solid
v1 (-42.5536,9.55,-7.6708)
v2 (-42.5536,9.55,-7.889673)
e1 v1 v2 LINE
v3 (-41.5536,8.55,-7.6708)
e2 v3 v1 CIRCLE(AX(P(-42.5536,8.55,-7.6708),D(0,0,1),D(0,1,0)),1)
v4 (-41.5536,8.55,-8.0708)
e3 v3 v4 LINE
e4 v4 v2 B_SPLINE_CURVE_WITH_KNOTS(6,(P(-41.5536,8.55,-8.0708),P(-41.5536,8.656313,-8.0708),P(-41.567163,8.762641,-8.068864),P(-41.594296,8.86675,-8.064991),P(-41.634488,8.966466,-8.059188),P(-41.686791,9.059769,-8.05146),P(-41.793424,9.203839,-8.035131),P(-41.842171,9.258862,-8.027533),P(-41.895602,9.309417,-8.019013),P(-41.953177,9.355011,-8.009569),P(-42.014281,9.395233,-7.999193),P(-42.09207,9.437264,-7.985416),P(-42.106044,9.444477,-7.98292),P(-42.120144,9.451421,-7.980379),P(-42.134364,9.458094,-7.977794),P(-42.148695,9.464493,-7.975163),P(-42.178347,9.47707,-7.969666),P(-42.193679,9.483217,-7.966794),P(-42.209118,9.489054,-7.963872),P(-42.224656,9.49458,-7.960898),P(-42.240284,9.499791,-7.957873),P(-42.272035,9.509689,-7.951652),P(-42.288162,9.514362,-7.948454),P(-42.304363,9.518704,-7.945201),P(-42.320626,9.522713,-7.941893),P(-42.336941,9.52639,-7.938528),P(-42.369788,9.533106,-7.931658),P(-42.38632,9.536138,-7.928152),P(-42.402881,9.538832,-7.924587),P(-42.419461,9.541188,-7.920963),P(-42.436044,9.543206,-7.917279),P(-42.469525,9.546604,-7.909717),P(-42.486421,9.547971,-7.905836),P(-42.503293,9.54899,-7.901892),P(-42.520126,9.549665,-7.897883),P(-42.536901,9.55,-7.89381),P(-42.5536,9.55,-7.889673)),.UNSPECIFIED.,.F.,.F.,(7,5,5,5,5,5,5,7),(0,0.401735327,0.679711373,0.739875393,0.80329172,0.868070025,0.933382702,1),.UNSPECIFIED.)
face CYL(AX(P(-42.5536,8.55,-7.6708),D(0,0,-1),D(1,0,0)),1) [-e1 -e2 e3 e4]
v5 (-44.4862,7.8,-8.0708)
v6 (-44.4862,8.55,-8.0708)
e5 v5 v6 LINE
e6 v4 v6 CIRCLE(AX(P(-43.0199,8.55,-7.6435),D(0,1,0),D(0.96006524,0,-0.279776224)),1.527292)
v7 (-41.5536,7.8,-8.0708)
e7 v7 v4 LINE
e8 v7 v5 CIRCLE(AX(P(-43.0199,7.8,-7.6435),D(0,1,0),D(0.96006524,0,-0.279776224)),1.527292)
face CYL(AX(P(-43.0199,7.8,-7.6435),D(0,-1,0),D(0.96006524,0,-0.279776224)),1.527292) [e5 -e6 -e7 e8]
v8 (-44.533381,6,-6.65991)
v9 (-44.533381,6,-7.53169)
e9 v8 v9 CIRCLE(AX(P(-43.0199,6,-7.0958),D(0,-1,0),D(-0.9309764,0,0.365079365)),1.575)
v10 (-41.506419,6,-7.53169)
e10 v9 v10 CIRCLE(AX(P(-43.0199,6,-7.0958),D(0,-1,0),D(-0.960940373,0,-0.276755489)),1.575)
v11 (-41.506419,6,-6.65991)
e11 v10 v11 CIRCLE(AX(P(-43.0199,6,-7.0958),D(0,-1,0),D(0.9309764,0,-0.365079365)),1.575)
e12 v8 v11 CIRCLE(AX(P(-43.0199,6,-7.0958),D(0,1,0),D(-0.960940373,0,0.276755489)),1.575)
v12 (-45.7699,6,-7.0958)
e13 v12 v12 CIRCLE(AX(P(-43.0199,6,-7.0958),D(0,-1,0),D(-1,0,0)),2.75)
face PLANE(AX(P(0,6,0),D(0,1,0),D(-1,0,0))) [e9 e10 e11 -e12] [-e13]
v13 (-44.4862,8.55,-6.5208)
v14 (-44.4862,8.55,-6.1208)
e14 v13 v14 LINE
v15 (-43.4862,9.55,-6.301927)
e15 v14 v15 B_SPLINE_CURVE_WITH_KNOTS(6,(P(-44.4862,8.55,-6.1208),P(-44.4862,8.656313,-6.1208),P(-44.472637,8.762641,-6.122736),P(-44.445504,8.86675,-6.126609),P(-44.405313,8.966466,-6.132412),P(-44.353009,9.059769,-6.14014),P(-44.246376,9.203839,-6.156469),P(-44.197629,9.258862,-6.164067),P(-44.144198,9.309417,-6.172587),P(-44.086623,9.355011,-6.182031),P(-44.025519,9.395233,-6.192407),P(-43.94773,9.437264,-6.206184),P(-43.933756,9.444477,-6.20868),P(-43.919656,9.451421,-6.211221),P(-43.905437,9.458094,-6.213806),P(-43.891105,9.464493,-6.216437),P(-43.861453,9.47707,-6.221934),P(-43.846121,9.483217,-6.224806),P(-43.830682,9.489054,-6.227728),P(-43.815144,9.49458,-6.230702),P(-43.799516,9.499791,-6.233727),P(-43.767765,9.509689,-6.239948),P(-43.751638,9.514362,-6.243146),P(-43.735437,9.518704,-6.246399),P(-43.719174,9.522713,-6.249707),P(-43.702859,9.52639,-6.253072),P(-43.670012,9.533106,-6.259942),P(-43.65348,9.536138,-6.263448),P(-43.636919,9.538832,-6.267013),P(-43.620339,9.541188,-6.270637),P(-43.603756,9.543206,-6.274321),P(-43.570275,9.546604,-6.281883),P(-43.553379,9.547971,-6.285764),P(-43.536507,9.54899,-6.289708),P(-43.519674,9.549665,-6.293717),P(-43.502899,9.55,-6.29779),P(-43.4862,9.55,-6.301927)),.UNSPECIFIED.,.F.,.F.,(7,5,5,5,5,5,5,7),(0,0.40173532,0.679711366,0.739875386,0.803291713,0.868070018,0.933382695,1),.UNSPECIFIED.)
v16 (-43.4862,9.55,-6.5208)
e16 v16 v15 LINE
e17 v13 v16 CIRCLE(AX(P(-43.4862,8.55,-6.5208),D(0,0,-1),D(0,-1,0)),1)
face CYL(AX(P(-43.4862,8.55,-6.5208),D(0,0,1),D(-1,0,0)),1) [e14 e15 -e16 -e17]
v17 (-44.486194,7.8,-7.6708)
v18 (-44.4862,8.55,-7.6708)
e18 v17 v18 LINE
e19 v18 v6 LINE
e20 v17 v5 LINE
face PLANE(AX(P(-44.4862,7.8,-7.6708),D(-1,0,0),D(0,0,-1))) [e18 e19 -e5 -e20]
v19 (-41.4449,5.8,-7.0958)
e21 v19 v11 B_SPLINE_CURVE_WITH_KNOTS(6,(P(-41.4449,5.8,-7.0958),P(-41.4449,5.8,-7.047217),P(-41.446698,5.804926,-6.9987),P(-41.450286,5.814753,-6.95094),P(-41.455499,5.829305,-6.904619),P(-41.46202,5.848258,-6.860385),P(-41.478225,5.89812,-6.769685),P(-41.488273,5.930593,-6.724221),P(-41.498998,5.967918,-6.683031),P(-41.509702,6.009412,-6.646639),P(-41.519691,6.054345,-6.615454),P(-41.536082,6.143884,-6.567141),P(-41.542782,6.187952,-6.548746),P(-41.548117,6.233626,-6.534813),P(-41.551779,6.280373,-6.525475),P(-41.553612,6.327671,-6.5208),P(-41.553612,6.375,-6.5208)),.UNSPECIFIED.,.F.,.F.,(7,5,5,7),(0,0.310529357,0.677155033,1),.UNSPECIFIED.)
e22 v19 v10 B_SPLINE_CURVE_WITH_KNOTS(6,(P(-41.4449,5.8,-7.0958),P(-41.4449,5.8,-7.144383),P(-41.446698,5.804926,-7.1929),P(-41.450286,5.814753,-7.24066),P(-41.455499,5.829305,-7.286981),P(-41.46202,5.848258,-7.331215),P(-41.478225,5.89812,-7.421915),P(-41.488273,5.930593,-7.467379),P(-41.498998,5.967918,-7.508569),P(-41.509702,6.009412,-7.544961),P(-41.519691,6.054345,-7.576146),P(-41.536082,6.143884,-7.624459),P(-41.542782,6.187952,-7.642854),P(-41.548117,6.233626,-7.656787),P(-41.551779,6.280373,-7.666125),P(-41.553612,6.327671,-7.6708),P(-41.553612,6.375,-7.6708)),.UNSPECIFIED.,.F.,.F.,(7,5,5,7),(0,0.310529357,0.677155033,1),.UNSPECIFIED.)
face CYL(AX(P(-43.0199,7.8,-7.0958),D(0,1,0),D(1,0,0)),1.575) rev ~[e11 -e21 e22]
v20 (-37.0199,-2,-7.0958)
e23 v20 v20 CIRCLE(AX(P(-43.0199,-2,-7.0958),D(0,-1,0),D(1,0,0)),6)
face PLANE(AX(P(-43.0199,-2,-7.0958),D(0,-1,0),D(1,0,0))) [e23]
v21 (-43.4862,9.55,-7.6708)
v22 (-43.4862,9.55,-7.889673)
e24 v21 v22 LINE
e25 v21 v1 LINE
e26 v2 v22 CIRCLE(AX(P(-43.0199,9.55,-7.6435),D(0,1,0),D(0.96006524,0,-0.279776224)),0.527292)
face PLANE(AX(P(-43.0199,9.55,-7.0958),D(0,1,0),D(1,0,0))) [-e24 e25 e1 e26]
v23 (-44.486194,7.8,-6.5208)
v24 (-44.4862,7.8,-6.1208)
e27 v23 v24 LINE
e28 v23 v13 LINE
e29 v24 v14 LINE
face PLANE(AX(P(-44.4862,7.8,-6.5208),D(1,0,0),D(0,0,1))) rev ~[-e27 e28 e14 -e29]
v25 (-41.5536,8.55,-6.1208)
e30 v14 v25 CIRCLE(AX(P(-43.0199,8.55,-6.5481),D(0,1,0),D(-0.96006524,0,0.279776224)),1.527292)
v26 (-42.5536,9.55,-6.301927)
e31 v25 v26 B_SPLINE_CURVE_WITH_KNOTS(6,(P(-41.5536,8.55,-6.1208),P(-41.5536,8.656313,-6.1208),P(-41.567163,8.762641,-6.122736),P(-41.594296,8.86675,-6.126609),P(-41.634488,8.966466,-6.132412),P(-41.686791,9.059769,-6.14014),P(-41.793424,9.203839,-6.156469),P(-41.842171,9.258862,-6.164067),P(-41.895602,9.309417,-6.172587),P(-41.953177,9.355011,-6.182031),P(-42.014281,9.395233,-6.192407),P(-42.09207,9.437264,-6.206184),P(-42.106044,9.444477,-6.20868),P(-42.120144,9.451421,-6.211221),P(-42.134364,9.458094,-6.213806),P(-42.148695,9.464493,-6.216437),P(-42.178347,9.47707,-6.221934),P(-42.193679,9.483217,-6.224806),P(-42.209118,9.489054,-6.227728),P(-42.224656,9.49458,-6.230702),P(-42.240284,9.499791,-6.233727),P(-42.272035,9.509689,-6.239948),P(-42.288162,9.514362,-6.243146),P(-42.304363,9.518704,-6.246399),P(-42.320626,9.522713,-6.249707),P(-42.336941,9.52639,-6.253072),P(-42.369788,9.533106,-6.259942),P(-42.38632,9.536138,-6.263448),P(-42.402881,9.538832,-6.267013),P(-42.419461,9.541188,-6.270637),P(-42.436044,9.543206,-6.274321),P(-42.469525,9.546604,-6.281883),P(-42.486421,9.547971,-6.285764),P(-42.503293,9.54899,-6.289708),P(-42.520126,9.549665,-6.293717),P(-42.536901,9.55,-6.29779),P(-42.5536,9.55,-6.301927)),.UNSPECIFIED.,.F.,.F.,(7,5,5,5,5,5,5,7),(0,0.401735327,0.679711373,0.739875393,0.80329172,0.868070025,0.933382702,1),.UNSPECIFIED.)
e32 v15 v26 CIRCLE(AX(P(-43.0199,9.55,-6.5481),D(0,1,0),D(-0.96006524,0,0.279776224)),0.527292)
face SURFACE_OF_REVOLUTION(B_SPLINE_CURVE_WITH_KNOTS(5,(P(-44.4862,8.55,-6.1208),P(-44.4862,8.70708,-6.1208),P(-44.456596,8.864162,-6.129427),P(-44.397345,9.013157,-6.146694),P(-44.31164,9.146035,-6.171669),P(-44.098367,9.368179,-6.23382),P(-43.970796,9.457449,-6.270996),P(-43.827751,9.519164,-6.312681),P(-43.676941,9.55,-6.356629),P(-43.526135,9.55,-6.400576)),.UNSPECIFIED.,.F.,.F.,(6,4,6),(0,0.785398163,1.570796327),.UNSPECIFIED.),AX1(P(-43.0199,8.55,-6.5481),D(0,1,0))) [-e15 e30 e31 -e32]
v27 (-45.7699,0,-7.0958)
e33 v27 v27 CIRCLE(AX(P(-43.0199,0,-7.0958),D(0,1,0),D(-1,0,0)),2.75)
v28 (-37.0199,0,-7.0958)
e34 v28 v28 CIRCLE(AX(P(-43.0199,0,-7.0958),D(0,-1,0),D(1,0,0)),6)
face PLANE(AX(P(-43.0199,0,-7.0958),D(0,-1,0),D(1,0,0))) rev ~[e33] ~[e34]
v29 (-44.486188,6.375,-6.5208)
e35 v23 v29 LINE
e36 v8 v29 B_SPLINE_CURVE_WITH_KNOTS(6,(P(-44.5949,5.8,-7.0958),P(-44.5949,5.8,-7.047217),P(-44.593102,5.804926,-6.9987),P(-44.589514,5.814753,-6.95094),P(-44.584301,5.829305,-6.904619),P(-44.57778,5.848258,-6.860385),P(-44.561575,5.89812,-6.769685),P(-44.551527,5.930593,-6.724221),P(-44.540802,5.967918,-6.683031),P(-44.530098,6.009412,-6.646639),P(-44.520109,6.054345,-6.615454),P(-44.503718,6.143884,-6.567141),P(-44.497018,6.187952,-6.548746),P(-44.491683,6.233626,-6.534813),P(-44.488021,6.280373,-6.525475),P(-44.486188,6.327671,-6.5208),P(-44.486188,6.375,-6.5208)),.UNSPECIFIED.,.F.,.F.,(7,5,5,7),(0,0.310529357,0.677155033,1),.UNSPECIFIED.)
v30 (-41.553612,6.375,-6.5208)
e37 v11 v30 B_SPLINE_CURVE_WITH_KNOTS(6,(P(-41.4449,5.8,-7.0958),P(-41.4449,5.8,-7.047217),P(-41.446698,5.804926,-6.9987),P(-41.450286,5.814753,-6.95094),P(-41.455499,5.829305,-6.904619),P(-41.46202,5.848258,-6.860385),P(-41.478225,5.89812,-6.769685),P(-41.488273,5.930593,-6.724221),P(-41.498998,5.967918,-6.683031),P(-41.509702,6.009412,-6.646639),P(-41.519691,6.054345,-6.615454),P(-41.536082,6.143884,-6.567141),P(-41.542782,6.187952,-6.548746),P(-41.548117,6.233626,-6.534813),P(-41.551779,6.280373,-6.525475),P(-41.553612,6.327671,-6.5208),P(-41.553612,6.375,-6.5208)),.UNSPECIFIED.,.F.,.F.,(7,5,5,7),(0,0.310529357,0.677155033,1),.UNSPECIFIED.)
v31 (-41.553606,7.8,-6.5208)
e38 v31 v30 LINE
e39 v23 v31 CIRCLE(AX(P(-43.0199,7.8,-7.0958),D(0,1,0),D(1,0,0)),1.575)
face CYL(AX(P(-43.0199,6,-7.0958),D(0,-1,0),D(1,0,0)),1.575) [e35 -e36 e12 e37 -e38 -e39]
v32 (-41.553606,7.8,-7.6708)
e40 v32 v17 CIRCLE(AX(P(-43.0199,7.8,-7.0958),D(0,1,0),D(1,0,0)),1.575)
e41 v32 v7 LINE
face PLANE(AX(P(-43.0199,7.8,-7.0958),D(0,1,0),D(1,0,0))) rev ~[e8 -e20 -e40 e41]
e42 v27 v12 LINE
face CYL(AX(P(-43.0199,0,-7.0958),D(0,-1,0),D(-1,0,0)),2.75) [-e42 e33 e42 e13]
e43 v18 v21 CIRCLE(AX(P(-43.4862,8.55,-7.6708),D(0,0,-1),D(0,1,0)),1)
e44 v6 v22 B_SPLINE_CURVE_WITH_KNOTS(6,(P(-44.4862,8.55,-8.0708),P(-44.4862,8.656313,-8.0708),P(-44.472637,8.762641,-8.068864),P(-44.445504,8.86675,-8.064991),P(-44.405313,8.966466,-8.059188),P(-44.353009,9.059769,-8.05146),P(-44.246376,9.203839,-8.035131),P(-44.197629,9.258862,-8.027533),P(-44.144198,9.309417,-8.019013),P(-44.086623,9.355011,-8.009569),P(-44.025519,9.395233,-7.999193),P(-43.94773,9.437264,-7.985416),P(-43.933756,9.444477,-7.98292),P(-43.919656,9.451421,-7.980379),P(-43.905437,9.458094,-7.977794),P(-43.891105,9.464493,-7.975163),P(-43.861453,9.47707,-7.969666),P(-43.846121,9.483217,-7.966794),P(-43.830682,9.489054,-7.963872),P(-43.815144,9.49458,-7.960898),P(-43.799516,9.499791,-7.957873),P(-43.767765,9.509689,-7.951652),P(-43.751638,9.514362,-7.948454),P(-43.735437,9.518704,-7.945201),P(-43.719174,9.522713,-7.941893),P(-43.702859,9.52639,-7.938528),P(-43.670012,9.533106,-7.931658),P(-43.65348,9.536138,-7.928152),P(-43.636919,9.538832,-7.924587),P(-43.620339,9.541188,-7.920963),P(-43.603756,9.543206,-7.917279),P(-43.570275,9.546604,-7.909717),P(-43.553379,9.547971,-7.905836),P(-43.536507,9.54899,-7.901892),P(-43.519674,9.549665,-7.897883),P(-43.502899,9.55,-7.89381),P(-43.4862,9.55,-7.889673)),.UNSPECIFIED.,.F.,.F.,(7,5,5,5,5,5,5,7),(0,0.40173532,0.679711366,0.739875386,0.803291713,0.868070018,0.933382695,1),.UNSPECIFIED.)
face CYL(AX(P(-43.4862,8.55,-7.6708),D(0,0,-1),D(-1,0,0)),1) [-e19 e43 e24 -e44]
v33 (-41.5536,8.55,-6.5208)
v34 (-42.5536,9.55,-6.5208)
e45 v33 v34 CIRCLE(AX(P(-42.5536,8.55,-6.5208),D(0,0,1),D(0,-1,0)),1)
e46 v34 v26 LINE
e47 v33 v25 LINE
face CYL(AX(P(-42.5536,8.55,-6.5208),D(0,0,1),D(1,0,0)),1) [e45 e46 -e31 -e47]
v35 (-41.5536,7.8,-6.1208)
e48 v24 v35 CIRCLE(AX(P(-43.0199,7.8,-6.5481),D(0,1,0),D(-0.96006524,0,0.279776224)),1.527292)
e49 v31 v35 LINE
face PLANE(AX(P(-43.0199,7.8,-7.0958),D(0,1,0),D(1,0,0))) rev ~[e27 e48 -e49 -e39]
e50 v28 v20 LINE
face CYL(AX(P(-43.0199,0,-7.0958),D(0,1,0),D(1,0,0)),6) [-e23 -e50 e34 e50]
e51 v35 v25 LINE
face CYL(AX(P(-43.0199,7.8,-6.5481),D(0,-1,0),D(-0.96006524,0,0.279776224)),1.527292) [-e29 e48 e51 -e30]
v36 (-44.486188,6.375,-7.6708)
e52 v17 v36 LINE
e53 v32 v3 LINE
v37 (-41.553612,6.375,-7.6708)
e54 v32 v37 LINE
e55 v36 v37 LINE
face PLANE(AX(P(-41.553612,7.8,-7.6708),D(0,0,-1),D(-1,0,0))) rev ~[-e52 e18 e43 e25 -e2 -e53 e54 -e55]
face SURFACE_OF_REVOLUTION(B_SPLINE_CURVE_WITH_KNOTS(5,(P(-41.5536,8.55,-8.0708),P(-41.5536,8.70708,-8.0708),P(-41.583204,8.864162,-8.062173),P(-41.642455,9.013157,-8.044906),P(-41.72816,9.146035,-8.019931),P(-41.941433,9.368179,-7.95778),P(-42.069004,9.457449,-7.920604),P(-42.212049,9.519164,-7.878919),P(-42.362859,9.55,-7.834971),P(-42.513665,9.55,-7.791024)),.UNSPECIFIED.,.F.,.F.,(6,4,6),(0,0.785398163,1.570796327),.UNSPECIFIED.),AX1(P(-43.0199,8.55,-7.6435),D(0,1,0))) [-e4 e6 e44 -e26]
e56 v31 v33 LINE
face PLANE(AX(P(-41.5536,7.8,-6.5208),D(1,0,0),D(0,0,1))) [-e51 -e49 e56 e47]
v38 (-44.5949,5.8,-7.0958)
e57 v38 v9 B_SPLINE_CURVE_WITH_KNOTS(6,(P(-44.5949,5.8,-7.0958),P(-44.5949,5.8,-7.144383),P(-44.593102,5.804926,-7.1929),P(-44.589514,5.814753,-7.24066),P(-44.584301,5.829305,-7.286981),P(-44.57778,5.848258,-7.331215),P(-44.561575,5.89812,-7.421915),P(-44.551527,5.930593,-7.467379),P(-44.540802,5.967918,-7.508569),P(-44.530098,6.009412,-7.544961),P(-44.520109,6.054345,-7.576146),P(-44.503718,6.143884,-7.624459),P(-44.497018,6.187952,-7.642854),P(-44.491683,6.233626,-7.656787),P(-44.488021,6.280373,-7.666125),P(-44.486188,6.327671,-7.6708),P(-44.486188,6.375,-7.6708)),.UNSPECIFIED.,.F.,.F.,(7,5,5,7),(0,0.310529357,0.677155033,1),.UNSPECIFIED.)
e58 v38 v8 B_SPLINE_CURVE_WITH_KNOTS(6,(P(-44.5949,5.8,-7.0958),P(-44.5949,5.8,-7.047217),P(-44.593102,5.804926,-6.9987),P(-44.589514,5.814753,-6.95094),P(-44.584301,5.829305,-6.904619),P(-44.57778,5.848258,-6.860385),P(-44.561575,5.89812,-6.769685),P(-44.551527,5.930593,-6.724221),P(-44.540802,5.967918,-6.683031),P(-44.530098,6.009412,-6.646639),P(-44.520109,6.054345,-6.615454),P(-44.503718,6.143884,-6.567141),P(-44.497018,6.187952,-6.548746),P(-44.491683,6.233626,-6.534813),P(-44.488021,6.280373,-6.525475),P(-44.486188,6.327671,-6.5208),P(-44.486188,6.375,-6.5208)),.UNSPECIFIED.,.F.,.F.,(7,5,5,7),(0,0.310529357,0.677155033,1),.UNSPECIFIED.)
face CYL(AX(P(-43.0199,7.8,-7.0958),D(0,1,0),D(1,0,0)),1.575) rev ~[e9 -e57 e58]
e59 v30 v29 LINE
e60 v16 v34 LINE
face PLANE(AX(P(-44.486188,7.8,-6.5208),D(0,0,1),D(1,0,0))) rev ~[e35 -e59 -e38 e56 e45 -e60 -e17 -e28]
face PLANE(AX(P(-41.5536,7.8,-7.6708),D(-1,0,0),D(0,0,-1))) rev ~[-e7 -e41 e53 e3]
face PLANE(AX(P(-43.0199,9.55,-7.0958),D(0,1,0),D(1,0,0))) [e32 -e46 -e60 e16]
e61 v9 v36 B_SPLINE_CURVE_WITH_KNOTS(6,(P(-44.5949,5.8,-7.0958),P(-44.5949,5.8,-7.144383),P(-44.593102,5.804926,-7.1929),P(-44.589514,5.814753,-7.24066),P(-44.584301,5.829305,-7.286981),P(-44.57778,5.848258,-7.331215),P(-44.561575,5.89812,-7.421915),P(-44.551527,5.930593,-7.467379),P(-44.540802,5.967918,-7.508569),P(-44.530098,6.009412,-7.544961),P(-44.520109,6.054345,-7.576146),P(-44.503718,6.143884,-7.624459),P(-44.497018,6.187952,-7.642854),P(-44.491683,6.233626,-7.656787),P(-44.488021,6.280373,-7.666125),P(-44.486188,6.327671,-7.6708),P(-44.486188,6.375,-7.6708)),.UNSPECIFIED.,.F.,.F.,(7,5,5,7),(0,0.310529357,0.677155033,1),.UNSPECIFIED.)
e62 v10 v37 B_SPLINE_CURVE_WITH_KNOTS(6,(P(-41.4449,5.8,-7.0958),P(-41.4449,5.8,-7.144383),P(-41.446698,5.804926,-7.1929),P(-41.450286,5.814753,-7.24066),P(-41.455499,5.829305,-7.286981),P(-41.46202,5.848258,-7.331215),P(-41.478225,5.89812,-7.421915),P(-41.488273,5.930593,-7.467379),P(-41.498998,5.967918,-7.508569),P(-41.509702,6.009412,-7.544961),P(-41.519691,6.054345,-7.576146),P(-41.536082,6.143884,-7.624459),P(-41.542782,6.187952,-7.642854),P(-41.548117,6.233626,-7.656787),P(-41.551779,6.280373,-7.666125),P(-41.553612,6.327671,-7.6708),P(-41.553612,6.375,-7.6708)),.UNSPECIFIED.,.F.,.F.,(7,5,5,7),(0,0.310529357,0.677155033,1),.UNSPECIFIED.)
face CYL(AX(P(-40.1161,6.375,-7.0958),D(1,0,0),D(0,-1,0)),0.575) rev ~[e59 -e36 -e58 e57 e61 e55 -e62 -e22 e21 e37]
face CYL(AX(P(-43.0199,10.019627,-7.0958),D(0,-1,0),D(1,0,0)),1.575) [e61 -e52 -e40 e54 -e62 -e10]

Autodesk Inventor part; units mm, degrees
ref_plane "YZ Plane" through (0, 0, 0) normal (1, 0, 0) x (0, 1, 0)
ref_plane "XZ Plane" through (0, 0, 0) normal (0, 1, 0) x (-1, 0, 0)
ref_plane "XY Plane" through (0, 0, 0) normal (0, 0, 1) x (1, 0, 0)
sketch "Sketch1" plane through (0, 0, 0) normal (0, 1, 0) x (-1, 0, 0)
  circle A0 centre (43.0199, -7.0958) radius 2.75
  circle A1 centre (-31.8801, -7.0958) radius 2.75
  circle A2 centre (44.3199, 41.1042) radius 2.75
  circle A3 centre (-38.2801, 41.1042) radius 2.75
  line L0 (58.8879, -10.055) -> (-40.7911, -10.055) construction
  line L1 (-40.7911, -10.055) -> (-40.7911, 44.0634) construction
  line L2 (-40.7911, 44.0634) -> (58.8879, 44.0634) construction
  line L3 (58.8879, 44.0634) -> (58.8879, -10.055) construction
  line L4 (43.0199, -7.0958) -> (43.0199, -10.055)
  line L5 (44.3199, 41.1042) -> (44.3199, 44.0634)
  line L6 (47.0699, -9.8458) -> (-41.0301, -9.8458)
  line L7 (-41.0301, -9.8458) -> (-41.0301, 43.8542)
  line L8 (-41.0301, 43.8542) -> (47.0699, 43.8542)
  line L9 (47.0699, 43.8542) -> (47.0699, -9.8458)
  dimension "d0" = 5.5
  dimension "d1" = 74.9
  dimension "d2" = 1.3
  dimension "d3" = 48.2
  dimension "d5" = 82.6
  dimension "d9" = 15.868
  dimension "d10" = 54.1184
  dimension "d11" = 99.679
extrude "Extrusion2" add sketch "Sketch1" along normal blind 6 contours A0
sketch "Sketch4" plane through (-43.0199, 6, -7.0958) normal (0, 1, 0) x (1, 0, 0)
  circle A0 centre (0, 0) radius 2.75 projected
  circle A1 centre (0, 0) radius 1.575
  point P0 (43.0199, -7.0958)
  dimension "d24" = 3.15
extrude "Extrusion3" add sketch "Sketch4" along normal blind 1.8 contours A1
sketch "Sketch5" plane through (-43.0199, 7.8, -7.0958) normal (0, 1, 0) x (1, 0, 0)
  line L0 (-1.575, -0.575) -> (1.575, -0.575)
  line L1 (1.575, -0.575) -> (1.575, 0.575)
  line L2 (1.575, 0.575) -> (-1.575, 0.575)
  line L3 (-1.575, 0.575) -> (-1.575, -0.575)
  line L4 (-1.575, -0.575) -> (1.575, 0.575) construction
  line L5 (1.575, -0.575) -> (-1.575, 0.575) construction
  circle A0 centre (0, 0) radius 1.575 projected
  point P0 (43.0199, -7.0958)
  point P1 (-1.4663, -0.575)
  point P2 (1.4663, -0.575)
  point P3 (1.4663, 0.575)
  point P4 (-1.4663, 0.575)
  dimension "d27" = 1
extrude "Extrusion4" cut sketch "Sketch5" against normal blind 6 contours A0 L2 L0
sketch "Sketch6" plane through (-43.0199, 7.8, -7.0958) normal (0, 1, 0) x (1, 0, 0)
  arc A0 (1.4663, 0.575) -> (-1.4663, 0.575) centre (0, 0) ccw construction
  line L0 (-1.4663, 0.575) -> (-1.4663, 0.975)
  line L1 (-1.4663, 0.575) -> (1.4663, 0.575) projected
  line L2 (1.4663, 0.575) -> (1.4663, 0.975)
  arc A1 (1.4663, 0.975) -> (-1.4663, 0.975) centre (0, 0.5477) ccw
  arc A2 (-1.4663, 0.575) -> (-1.4663, -0.575) centre (0, 0) ccw construction
  line L3 (-1.575, 0) -> (1.575, 0) construction
  arc A3 (1.4663, -0.575) -> (1.4663, 0.575) centre (0, 0) ccw construction
  line L4 (-1.4663, -0.575) -> (-1.4663, -0.975)
  line L5 (-1.4663, -0.575) -> (1.4663, -0.575)
  line L6 (1.4663, -0.575) -> (1.4663, -0.975)
  arc A4 (-1.4663, -0.975) -> (1.4663, -0.975) centre (0, -0.5477) ccw
  point P0 (43.0199, -7.0958)
  point P1 (0, 1.575)
  point P2 (0, 2.075)
  dimension "d30" = 0.4
  dimension "d31" = 0.4
  dimension "d32" = 0.5
extrude "Extrusion5" add sketch "Sketch6" along normal blind 1.75
fillet "Fillet1" radius 1 6 edges at (-44.4862, 9.55, -6.3208) (-41.5537, 9.55, -6.3208) (-43.0199, 9.55, -5.0208) (-41.5537, 9.55, -7.8708) (-44.4862, 9.55, -7.8708) (-43.0199, 9.55, -9.1708)
sketch "Sketch7" plane through (-43.0199, 1.8, -7.0958) normal (0, 1, 0) x (1, 0, 0)
  line L0 (1.4663, -0.575) -> (-1.4663, -0.575) projected
  arc A0 (1.4663, -0.575) -> (1.4663, 0.575) centre (0, 0) ccw projected
  line L1 (-1.4663, 0.575) -> (1.4663, 0.575) projected
  arc A1 (-1.4663, 0.575) -> (-1.4663, -0.575) centre (0, 0) ccw projected
  point P0 (43.0199, -7.0958)
extrude "Extrusion6" add sketch "Sketch7" along normal blind 4
fillet "Fillet2" radius 0.575 2 edges at (-43.0199, 5.8, -7.6708) (-43.0199, 5.8, -6.5208)
sketch "Sketch16" plane through (-43.0199, 0, -7.0958) normal (0, -1, 0) x (1, 0, 0)
  circle A0 centre (0, 0) radius 6
  point P0 (43.0199, 7.0958)
  dimension "d56" = 12
extrude "Extrusion9" add sketch "Sketch16" along normal blind 2
properties part number "arduino_mega_standoffs_retention-clips_single"
